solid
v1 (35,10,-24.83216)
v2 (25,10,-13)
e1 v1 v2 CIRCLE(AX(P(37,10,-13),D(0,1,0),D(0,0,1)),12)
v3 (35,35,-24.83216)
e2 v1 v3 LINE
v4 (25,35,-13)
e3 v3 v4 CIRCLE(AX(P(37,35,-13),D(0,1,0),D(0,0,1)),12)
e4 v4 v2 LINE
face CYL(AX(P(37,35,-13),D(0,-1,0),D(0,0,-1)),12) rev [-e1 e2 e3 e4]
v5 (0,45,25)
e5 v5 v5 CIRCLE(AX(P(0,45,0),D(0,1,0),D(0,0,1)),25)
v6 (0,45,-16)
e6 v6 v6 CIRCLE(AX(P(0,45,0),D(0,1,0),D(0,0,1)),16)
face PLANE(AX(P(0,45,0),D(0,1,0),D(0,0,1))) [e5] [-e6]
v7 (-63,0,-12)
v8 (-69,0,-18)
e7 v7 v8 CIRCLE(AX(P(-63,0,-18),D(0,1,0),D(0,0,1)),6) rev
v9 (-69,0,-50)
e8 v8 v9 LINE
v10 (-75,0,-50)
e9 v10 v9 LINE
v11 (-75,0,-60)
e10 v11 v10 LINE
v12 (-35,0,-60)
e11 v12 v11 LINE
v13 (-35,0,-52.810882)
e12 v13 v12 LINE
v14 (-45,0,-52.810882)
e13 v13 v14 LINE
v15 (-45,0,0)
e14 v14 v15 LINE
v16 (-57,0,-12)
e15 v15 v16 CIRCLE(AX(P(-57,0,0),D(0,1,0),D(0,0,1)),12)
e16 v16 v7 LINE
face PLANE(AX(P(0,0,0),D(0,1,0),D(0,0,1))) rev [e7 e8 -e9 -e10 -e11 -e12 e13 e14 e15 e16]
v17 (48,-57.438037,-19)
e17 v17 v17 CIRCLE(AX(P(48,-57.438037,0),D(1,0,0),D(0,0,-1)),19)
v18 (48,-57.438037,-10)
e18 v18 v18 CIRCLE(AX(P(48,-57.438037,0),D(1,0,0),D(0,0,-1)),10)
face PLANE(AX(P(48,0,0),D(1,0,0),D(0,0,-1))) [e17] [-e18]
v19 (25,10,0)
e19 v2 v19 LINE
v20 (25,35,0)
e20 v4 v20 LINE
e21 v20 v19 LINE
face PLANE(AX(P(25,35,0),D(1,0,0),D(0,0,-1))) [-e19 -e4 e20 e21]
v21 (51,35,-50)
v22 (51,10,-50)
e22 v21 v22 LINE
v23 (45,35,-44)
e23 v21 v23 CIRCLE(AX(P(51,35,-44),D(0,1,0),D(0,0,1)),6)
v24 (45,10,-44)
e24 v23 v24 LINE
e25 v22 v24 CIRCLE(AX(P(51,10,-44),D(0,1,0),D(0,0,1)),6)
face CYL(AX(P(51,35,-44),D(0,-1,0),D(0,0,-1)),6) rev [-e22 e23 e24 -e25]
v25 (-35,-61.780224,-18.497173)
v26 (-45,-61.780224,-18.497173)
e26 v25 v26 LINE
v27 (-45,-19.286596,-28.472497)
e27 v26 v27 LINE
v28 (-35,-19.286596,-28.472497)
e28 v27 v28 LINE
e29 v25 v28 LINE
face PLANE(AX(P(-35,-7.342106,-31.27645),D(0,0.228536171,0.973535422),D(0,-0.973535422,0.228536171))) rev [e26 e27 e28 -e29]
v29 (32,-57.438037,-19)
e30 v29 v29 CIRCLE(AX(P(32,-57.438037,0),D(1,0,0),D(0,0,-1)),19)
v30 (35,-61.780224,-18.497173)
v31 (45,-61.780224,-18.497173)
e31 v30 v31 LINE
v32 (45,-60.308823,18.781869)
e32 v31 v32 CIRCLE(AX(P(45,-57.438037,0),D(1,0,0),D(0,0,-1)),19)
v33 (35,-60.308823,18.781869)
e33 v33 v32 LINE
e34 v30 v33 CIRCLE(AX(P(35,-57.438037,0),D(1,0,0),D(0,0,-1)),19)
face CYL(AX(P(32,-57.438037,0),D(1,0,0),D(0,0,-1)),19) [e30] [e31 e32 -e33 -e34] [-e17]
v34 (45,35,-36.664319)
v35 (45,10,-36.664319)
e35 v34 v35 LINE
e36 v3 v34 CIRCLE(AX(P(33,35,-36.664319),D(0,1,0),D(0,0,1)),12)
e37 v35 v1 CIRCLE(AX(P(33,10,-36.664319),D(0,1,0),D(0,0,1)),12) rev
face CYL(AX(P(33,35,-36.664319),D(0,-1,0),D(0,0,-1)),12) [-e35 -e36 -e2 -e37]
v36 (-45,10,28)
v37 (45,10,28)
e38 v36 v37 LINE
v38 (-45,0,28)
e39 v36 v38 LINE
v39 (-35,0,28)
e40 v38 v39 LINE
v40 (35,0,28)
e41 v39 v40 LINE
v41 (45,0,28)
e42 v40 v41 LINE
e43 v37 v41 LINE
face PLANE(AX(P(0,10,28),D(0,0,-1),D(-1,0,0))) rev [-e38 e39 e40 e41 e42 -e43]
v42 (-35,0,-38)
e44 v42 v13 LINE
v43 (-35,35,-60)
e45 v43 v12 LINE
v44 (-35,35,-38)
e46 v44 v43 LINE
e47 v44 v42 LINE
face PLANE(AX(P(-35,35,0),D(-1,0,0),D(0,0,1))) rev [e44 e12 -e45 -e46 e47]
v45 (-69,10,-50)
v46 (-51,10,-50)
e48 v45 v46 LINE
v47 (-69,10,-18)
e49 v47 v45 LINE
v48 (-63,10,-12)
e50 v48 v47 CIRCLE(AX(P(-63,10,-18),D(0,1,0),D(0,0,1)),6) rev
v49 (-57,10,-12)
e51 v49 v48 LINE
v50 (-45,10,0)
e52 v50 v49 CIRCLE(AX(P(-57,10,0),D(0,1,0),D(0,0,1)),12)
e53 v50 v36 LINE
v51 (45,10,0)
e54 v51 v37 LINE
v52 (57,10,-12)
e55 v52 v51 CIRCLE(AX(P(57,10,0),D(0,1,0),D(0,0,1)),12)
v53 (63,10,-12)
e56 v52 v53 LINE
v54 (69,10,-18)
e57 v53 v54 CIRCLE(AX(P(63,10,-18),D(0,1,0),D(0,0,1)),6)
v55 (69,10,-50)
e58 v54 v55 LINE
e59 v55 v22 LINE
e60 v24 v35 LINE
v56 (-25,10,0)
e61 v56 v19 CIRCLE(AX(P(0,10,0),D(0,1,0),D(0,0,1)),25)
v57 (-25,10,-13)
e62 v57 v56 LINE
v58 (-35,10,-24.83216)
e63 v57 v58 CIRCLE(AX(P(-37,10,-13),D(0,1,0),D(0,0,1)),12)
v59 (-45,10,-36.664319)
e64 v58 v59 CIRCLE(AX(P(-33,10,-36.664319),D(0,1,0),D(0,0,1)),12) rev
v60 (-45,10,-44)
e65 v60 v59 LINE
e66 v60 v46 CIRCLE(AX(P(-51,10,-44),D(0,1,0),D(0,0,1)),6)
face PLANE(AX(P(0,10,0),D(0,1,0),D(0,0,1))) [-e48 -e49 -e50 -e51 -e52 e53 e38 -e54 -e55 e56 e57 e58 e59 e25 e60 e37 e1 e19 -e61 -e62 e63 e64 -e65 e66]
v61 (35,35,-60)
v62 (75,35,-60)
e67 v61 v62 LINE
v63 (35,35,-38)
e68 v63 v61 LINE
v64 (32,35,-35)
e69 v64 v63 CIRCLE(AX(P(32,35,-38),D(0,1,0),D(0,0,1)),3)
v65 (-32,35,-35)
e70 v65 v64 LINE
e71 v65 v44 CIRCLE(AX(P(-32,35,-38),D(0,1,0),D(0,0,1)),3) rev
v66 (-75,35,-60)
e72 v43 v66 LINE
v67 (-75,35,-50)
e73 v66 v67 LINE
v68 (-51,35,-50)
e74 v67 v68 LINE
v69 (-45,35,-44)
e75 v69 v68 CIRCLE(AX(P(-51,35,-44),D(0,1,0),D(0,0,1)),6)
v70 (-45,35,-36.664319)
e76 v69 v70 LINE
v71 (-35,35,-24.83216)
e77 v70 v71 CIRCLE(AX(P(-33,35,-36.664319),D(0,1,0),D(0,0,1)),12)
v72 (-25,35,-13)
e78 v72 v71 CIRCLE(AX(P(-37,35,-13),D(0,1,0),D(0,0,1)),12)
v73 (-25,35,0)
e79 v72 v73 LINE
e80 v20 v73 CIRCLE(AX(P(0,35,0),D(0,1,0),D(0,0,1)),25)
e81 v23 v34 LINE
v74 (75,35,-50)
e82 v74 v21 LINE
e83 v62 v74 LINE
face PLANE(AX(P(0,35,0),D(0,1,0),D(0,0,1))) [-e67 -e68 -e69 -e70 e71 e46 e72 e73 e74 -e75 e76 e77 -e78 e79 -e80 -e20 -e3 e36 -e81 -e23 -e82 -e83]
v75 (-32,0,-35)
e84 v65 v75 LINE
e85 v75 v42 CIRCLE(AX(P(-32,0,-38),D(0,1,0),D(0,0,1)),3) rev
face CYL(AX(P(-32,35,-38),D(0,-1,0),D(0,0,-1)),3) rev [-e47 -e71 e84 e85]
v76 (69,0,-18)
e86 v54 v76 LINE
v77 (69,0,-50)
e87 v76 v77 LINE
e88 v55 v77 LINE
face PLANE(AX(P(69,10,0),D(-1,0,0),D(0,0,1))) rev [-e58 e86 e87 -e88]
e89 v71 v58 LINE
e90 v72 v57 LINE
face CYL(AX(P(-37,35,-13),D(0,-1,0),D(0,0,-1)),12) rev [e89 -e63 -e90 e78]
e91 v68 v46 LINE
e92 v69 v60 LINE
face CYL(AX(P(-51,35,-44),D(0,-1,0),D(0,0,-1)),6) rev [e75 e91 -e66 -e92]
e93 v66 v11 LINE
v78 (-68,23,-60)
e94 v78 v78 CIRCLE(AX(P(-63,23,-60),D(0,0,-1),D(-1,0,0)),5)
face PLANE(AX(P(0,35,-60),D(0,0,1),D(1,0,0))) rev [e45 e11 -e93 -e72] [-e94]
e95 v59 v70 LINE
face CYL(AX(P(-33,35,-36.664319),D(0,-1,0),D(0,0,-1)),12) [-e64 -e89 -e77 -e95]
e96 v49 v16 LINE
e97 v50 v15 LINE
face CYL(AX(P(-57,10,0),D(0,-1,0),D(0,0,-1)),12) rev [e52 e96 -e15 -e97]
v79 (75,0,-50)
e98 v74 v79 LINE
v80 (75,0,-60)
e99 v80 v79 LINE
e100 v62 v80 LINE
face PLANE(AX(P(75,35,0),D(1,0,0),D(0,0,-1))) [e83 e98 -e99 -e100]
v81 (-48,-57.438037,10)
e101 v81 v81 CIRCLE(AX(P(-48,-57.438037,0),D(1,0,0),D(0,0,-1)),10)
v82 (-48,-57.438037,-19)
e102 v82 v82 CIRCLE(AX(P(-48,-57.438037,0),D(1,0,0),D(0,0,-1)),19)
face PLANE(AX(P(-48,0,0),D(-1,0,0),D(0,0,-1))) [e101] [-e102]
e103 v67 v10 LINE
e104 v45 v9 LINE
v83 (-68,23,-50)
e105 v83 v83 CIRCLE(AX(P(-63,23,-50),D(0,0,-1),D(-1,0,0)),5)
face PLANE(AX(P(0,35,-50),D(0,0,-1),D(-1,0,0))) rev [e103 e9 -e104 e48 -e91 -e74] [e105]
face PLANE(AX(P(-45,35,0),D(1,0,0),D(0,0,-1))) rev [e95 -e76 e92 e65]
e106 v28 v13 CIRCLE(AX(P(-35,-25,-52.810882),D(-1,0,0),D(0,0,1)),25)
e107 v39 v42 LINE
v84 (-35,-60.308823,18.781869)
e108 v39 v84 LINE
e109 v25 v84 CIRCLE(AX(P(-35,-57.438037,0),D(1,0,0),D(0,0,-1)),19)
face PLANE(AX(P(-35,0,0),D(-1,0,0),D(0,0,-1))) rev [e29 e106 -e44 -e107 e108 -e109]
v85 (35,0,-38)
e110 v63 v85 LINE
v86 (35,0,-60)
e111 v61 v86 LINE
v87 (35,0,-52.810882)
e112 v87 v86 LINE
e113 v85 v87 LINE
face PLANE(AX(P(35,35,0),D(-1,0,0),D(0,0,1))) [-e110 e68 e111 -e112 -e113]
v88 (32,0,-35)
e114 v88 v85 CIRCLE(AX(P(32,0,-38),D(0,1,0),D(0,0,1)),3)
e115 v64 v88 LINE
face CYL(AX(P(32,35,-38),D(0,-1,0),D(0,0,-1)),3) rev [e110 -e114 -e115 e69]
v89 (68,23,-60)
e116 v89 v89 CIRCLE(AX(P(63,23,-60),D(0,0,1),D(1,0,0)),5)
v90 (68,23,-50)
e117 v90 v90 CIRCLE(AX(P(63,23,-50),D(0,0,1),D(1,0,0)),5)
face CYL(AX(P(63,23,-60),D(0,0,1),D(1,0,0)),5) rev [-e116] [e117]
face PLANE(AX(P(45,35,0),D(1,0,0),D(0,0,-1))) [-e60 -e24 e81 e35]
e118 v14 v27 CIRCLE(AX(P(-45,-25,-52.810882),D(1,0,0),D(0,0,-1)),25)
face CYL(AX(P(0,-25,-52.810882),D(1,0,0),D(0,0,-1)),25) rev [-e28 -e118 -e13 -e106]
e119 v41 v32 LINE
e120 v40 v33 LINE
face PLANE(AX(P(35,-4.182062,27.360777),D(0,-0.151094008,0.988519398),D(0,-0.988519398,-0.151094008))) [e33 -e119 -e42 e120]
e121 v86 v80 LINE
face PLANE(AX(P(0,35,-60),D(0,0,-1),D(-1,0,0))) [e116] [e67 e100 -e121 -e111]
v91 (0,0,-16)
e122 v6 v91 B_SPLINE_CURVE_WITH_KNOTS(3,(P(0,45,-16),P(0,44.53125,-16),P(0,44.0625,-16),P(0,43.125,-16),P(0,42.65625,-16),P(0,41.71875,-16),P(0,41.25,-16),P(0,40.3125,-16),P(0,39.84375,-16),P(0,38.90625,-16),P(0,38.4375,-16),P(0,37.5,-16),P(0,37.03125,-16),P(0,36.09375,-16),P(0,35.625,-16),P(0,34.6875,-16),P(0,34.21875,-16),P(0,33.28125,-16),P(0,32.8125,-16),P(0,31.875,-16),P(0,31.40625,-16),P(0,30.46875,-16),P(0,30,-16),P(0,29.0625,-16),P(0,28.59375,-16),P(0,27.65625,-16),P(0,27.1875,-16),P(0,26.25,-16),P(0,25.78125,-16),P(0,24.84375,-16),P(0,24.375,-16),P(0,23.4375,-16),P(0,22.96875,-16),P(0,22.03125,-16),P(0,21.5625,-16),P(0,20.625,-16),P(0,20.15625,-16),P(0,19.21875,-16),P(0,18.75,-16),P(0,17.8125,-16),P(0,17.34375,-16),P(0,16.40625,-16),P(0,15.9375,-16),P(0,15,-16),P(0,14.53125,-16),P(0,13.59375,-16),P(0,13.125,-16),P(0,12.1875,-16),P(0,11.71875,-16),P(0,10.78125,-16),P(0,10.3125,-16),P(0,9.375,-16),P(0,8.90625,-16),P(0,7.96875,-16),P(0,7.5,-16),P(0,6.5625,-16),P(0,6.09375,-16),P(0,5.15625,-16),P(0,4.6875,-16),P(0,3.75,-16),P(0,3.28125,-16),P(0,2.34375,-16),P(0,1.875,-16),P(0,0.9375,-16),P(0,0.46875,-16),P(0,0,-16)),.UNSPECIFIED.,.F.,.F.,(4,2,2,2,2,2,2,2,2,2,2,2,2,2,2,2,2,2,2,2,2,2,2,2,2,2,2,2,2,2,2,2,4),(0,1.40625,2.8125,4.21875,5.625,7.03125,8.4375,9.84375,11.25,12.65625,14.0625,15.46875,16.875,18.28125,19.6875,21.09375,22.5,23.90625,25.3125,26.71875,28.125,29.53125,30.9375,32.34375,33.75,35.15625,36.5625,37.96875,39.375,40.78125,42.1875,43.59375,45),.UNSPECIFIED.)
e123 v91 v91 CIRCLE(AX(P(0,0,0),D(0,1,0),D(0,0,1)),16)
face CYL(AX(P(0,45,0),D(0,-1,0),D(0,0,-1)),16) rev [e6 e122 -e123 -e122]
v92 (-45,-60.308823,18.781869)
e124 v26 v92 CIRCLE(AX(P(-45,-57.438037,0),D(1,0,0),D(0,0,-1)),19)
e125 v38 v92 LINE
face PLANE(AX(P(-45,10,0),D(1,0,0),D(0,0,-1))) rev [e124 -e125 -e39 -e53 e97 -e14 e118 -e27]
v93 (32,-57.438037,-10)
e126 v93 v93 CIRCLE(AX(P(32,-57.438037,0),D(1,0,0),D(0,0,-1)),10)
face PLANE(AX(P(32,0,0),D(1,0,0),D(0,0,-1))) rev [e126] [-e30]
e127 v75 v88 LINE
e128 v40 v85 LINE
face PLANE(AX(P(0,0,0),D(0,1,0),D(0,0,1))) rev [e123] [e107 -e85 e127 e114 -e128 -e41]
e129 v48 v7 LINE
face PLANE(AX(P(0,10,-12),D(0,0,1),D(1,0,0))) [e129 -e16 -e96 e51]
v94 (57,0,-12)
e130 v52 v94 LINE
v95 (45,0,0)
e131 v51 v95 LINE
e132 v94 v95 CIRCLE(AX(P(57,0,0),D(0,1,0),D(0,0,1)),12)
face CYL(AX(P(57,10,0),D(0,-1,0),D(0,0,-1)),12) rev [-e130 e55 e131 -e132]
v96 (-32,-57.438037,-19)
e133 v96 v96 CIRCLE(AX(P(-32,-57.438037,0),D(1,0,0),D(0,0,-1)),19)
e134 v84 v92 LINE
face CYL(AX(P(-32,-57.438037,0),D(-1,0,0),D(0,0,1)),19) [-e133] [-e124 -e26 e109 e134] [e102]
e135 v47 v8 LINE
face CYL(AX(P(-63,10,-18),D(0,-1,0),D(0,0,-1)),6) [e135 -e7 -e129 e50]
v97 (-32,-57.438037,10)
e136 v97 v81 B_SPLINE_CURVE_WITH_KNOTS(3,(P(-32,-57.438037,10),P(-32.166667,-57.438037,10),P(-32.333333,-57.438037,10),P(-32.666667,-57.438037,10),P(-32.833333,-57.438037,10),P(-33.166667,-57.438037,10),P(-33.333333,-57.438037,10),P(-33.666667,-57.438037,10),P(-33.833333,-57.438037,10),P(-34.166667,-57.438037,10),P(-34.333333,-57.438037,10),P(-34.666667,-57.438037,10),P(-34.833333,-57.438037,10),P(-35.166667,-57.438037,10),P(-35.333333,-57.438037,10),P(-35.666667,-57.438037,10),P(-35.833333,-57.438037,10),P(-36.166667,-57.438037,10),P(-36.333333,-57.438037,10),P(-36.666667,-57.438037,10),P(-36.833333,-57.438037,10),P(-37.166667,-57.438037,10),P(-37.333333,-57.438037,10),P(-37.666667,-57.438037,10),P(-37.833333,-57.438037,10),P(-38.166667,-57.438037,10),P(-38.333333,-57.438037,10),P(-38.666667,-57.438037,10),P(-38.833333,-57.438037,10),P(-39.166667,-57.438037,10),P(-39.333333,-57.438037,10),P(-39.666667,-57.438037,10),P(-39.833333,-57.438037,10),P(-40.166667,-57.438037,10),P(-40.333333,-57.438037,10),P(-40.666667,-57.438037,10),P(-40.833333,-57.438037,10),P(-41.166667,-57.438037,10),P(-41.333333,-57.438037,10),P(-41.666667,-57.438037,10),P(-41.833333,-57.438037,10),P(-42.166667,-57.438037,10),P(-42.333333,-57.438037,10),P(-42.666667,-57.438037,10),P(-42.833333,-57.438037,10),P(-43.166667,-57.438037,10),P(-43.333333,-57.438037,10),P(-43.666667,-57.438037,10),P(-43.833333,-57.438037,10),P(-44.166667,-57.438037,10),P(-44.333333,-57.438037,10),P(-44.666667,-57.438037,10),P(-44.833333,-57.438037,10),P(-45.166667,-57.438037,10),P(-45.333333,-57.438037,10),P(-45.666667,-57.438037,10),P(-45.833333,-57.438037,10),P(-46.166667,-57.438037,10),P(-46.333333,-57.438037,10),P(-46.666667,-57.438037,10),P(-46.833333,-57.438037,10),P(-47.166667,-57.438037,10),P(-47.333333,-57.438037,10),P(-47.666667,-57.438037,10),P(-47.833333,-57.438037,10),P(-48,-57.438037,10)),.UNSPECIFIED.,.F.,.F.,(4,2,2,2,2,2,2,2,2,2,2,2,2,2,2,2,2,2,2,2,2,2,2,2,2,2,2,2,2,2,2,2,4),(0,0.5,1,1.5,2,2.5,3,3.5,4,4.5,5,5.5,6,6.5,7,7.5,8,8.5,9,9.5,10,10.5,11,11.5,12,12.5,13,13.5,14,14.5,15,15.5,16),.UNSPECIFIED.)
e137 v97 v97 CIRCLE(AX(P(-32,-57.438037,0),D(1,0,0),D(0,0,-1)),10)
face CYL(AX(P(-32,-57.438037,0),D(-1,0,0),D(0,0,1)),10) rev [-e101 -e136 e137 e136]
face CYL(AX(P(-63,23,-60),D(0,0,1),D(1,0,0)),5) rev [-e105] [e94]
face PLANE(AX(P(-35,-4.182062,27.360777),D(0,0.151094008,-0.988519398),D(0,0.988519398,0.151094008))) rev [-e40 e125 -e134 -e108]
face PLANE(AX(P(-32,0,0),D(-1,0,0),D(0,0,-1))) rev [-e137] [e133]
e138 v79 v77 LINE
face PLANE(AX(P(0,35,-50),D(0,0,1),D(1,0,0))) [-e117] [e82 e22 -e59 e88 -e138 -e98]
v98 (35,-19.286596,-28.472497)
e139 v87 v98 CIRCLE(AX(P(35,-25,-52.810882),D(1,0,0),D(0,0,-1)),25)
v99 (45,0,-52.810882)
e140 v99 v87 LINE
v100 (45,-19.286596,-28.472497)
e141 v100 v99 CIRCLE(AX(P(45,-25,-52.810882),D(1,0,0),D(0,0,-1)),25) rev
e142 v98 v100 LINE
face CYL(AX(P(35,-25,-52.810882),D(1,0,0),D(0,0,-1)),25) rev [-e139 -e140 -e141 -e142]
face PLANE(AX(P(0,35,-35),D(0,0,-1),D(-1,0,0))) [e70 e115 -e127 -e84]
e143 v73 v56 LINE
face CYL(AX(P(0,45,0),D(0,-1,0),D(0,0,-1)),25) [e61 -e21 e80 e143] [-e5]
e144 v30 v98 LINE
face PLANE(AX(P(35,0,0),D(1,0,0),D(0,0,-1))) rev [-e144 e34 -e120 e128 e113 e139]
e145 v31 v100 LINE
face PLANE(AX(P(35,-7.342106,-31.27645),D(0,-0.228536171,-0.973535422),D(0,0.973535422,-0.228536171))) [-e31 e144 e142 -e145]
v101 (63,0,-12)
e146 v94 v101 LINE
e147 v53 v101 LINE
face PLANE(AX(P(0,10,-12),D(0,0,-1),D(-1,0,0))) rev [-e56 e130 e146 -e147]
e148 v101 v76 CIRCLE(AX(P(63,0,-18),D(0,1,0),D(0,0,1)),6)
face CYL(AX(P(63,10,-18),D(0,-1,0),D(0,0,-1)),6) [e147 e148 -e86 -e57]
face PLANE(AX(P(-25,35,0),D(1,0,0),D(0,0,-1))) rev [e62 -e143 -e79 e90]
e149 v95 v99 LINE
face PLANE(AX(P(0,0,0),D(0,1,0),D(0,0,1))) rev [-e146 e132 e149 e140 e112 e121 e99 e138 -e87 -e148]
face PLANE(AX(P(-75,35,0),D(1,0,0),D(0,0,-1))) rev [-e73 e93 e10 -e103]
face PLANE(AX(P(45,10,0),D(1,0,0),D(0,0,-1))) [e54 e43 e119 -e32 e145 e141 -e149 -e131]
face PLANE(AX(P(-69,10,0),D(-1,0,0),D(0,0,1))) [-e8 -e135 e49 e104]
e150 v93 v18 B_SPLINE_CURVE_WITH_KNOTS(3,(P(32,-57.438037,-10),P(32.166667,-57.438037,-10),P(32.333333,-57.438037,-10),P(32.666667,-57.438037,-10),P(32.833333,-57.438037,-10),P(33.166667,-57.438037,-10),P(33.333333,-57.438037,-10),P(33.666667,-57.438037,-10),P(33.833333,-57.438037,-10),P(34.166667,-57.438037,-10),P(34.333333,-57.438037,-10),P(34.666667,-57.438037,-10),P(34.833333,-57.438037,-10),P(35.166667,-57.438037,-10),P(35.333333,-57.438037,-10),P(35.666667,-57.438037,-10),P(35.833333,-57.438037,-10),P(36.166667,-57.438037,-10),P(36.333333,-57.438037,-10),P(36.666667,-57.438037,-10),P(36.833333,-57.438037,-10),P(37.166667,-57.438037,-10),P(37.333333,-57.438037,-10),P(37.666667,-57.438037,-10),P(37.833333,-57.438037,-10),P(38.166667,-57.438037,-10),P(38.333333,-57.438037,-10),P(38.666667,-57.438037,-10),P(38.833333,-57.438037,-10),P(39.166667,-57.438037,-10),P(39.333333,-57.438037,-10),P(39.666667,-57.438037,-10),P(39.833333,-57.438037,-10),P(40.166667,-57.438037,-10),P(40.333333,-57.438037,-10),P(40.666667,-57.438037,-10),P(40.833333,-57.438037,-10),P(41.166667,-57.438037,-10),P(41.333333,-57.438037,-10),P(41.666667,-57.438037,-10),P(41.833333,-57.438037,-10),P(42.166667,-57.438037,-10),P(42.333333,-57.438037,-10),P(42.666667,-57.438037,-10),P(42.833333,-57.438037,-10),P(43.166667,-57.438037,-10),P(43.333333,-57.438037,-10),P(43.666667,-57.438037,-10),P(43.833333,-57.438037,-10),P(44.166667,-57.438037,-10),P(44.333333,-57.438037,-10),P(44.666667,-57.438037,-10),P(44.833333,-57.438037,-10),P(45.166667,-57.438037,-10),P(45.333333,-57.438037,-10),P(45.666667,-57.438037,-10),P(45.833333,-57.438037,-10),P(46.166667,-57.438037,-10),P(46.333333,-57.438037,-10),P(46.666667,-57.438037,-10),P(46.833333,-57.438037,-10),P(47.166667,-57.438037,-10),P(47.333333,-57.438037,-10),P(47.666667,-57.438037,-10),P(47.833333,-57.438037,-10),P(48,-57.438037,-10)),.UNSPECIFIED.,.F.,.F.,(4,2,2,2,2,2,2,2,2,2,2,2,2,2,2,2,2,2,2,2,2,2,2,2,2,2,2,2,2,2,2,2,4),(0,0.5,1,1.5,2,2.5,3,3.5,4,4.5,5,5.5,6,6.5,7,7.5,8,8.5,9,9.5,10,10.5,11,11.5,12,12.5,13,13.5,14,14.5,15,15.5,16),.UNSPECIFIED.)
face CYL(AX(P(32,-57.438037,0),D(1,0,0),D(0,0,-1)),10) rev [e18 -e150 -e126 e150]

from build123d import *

# Parameters (mm, degrees)
BOSS_EXTRUDE1_DEPTH   = 10
SKETCH1_3_R           = 25
SKETCH1_3_R_2         = 16
BOSS_EXTRUDE2_DEPTH   = 45
BOSS_EXTRUDE3_DEPTH   = 35
FILLET1_R             = 12
BOSS_EXTRUDE4_DEPTH   = 10
BOSS_EXTRUDE5_START   = 3
SKETCH2_3_R           = 19
SKETCH2_3_R_2         = 10
BOSS_EXTRUDE5_DEPTH   = 16
FILLET2_R             = 25
MIRROR1_START         = -45
MIRROR1_OUTLINE_R     = 10
MIRROR1_DEPTH         = 10
MIRROR1_START_2       = -48
MIRROR1_2_OUTLINE_R   = 19
MIRROR1_2_OUTLINE_R_2 = 10
MIRROR1_2_DEPTH       = 16
SKETCH3_R             = 5
CUT_EXTRUDE1_DEPTH    = 133.483106346


# Read off the part's stored shape, not the designer's step: Mirror1
with BuildPart() as part:
    # Sketch1 → Boss-Extrude1 (new body)
    with BuildSketch(Plane(origin=(0, 0, 0), x_dir=(1, 0, 0), z_dir=(0, 1, 0))):
        with BuildLine():
            Line((-51, 50), (-69, 50))
            Line((-69, 50), (-69, 18))
            ThreePointArc((-69, 18), (-67.242640687, 13.757359313), (-63, 12))
            Line((-63, 12), (-57, 12))
            ThreePointArc((-57, 12), (-48.514718626, 8.485281374), (-45, 0))
            Line((-45, 0), (-45, -28))
            Line((-45, -28), (45, -28))
            Line((45, -28), (45, 0))
            ThreePointArc((45, 0), (48.514718626, 8.485281374), (57, 12))
            Line((57, 12), (63, 12))
            ThreePointArc((63, 12), (67.242640687, 13.757359313), (69, 18))
            Line((69, 18), (69, 50))
            Line((69, 50), (51, 50))
            ThreePointArc((51, 50), (46.757359313, 48.242640687), (45, 44))
            Line((45, 44), (45, 25))
            Line((45, 25), (37, 25))
            ThreePointArc((37, 25), (28.514718626, 21.485281374), (25, 13))
            Line((25, 13), (25, 0))
            ThreePointArc((25, 0), (0, -25), (-25, 0))
            Line((-25, 0), (-25, 13))
            ThreePointArc((-25, 13), (-28.514718626, 21.485281374), (-37, 25))
            Line((-37, 25), (-45, 25))
            Line((-45, 25), (-45, 44))
            ThreePointArc((-45, 44), (-46.757359313, 48.242640687), (-51, 50))
        make_face()
    extrude(amount=BOSS_EXTRUDE1_DEPTH)

    # Sketch1<3> → Boss-Extrude2 (add)
    with BuildSketch(Plane(origin=(0, 0, 0), x_dir=(1, 0, 0), z_dir=(0, 1, 0))):
        Circle(SKETCH1_3_R)
        with Locations(Location((0, 0, 0), (0, 0, 90))):
            Circle(SKETCH1_3_R_2, mode=Mode.SUBTRACT)
    extrude(amount=BOSS_EXTRUDE2_DEPTH)

    # Sketch1<4> → Boss-Extrude3 (add)
    with BuildSketch(Plane(origin=(0, 0, 0), x_dir=(1, 0, 0), z_dir=(0, 1, 0))):
        with BuildLine():
            Line((32, 35), (-32, 35))
            ThreePointArc((-32, 35), (-34.121320344, 35.878679656), (-35, 38))
            Line((-35, 38), (-35, 60))
            Line((-35, 60), (-75, 60))
            Line((-75, 60), (-75, 50))
            Line((-75, 50), (-69, 50))
            Line((-69, 50), (-51, 50))
            ThreePointArc((-51, 50), (-46.757359313, 48.242640687), (-45, 44))
            Line((-45, 44), (-45, 25))
            Line((-45, 25), (-37, 25))
            ThreePointArc((-37, 25), (-28.514718626, 21.485281374), (-25, 13))
            Line((-25, 13), (-25, 0))
            ThreePointArc((-25, 0), (0, 25), (25, 0))
            Line((25, 0), (25, 13))
            ThreePointArc((25, 13), (28.514718626, 21.485281374), (37, 25))
            Line((37, 25), (45, 25))
            Line((45, 25), (45, 44))
            ThreePointArc((45, 44), (46.757359313, 48.242640687), (51, 50))
            Line((51, 50), (69, 50))
            Line((69, 50), (75, 50))
            Line((75, 50), (75, 60))
            Line((75, 60), (35, 60))
            Line((35, 60), (35, 38))
            ThreePointArc((35, 38), (34.121320344, 35.878679656), (32, 35))
        make_face()
    extrude(amount=BOSS_EXTRUDE3_DEPTH)

    # Fillet1
    fillet1_edges = [part.edges().sort_by_distance(p)[0] for p in [
        (-45, 22.5, -25),
        (45, 22.5, -25),
    ]]
    fillet(fillet1_edges, radius=FILLET1_R)

    # Sketch2 → Boss-Extrude4 (add)
    with BuildSketch(Plane(origin=(45, 0, 0), x_dir=(0, 0, -1), z_dir=(1, 0, 0))):
        with BuildLine():
            Line((0, 0), (-28, 0))
            Line((-28, 0), (-18.781868567, -60.308822731))
            ThreePointArc((-18.781868567, -60.308822731), (-14.414314705, -45.059525702), (0, -38.438036581))
            Line((0, -38.438036581), (0, 0))
        make_face()
        with BuildLine():
            Line((33, 0), (0, 0))
            Line((0, 0), (0, -38.438036581))
            ThreePointArc((0, -38.438036581), (13.435028843, -44.003007739), (19, -57.438036581))
            ThreePointArc((19, -57.438036581), (18.873874635, -59.623638617), (18.497173025, -61.780223826))
            Line((18.497173025, -61.780223826), (33, 0))
        make_face()
    extrude(amount=-BOSS_EXTRUDE4_DEPTH)

    # Sketch2<3> → Boss-Extrude5 (add)
    with BuildSketch(Plane(origin=(45, 0, 0), x_dir=(0, 0, -1), z_dir=(1, 0, 0)).offset(BOSS_EXTRUDE5_START)):
        with Locations((0, -57.438036581)):
            Circle(SKETCH2_3_R)
        with Locations((0, -57.438036581)):
            Circle(SKETCH2_3_R_2, mode=Mode.SUBTRACT)
    extrude(amount=-BOSS_EXTRUDE5_DEPTH)

    # Fillet2
    # the kernel refuses this fillet: 25 mm, written as the material it adds along each edge
    with BuildSketch(Plane(origin=(45, 0, -33), x_dir=(0, 0, -1), z_dir=(-1, 0, 0))) as fillet2_piece_1:
        with BuildLine():
            CenterArc((FILLET2_R * 0.792435294557, FILLET2_R), FILLET2_R, 193.210905315, 76.789094685)
            Line((-FILLET2_R * 0.181100127826, FILLET2_R * 0.771463829198), (0, 0))
            Line((0, 0), (FILLET2_R * 0.792435294557, 0))
        make_face()
    extrude(amount=10)

    # Mirror1 outline → Mirror1 (add)
    with BuildSketch(Plane.YZ.offset(MIRROR1_START)):
        with BuildLine():
            Line((0, 28), (-60.308822731, 18.781868567))
            ThreePointArc((-60.308822731, 18.781868567), (-76.423254036, 0.74934517), (-61.780223826, -18.497173025))
            Line((-61.780223826, -18.497173025), (-19.28659573, -28.472496804))
            ThreePointArc((-19.28659573, -28.472496804), (-5.406185839, -37.284052468), (0, -52.810882364))
            Line((0, -52.810882364), (0, 28))
        make_face()
        with Locations((-57.438036581, 0)):
            Circle(MIRROR1_OUTLINE_R, mode=Mode.SUBTRACT)
    extrude(amount=MIRROR1_DEPTH)

    # Mirror1 2 outline → Mirror1 2 (add)
    with BuildSketch(Plane.YZ.offset(MIRROR1_START_2)):
        with Locations((-57.438036581, 0)):
            Circle(MIRROR1_2_OUTLINE_R)
        with Locations((-57.438036581, 0)):
            Circle(MIRROR1_2_OUTLINE_R_2, mode=Mode.SUBTRACT)
    extrude(amount=MIRROR1_2_DEPTH)

    # Sketch3 → Cut-Extrude1 (cut, through all)
    with BuildSketch(Plane.XY.offset(-50)):
        with Locations((63, 23)):
            Circle(SKETCH3_R)
    cut_extrude1 = extrude(amount=-CUT_EXTRUDE1_DEPTH, mode=Mode.SUBTRACT)

    # Mirror2: Cut-Extrude1 across plane
    add(cut_extrude1.mirror(Plane(origin=(0, 0, 0), x_dir=(0, 0, 1), z_dir=(1, 0, 0))), mode=Mode.SUBTRACT)


solid = part.part
